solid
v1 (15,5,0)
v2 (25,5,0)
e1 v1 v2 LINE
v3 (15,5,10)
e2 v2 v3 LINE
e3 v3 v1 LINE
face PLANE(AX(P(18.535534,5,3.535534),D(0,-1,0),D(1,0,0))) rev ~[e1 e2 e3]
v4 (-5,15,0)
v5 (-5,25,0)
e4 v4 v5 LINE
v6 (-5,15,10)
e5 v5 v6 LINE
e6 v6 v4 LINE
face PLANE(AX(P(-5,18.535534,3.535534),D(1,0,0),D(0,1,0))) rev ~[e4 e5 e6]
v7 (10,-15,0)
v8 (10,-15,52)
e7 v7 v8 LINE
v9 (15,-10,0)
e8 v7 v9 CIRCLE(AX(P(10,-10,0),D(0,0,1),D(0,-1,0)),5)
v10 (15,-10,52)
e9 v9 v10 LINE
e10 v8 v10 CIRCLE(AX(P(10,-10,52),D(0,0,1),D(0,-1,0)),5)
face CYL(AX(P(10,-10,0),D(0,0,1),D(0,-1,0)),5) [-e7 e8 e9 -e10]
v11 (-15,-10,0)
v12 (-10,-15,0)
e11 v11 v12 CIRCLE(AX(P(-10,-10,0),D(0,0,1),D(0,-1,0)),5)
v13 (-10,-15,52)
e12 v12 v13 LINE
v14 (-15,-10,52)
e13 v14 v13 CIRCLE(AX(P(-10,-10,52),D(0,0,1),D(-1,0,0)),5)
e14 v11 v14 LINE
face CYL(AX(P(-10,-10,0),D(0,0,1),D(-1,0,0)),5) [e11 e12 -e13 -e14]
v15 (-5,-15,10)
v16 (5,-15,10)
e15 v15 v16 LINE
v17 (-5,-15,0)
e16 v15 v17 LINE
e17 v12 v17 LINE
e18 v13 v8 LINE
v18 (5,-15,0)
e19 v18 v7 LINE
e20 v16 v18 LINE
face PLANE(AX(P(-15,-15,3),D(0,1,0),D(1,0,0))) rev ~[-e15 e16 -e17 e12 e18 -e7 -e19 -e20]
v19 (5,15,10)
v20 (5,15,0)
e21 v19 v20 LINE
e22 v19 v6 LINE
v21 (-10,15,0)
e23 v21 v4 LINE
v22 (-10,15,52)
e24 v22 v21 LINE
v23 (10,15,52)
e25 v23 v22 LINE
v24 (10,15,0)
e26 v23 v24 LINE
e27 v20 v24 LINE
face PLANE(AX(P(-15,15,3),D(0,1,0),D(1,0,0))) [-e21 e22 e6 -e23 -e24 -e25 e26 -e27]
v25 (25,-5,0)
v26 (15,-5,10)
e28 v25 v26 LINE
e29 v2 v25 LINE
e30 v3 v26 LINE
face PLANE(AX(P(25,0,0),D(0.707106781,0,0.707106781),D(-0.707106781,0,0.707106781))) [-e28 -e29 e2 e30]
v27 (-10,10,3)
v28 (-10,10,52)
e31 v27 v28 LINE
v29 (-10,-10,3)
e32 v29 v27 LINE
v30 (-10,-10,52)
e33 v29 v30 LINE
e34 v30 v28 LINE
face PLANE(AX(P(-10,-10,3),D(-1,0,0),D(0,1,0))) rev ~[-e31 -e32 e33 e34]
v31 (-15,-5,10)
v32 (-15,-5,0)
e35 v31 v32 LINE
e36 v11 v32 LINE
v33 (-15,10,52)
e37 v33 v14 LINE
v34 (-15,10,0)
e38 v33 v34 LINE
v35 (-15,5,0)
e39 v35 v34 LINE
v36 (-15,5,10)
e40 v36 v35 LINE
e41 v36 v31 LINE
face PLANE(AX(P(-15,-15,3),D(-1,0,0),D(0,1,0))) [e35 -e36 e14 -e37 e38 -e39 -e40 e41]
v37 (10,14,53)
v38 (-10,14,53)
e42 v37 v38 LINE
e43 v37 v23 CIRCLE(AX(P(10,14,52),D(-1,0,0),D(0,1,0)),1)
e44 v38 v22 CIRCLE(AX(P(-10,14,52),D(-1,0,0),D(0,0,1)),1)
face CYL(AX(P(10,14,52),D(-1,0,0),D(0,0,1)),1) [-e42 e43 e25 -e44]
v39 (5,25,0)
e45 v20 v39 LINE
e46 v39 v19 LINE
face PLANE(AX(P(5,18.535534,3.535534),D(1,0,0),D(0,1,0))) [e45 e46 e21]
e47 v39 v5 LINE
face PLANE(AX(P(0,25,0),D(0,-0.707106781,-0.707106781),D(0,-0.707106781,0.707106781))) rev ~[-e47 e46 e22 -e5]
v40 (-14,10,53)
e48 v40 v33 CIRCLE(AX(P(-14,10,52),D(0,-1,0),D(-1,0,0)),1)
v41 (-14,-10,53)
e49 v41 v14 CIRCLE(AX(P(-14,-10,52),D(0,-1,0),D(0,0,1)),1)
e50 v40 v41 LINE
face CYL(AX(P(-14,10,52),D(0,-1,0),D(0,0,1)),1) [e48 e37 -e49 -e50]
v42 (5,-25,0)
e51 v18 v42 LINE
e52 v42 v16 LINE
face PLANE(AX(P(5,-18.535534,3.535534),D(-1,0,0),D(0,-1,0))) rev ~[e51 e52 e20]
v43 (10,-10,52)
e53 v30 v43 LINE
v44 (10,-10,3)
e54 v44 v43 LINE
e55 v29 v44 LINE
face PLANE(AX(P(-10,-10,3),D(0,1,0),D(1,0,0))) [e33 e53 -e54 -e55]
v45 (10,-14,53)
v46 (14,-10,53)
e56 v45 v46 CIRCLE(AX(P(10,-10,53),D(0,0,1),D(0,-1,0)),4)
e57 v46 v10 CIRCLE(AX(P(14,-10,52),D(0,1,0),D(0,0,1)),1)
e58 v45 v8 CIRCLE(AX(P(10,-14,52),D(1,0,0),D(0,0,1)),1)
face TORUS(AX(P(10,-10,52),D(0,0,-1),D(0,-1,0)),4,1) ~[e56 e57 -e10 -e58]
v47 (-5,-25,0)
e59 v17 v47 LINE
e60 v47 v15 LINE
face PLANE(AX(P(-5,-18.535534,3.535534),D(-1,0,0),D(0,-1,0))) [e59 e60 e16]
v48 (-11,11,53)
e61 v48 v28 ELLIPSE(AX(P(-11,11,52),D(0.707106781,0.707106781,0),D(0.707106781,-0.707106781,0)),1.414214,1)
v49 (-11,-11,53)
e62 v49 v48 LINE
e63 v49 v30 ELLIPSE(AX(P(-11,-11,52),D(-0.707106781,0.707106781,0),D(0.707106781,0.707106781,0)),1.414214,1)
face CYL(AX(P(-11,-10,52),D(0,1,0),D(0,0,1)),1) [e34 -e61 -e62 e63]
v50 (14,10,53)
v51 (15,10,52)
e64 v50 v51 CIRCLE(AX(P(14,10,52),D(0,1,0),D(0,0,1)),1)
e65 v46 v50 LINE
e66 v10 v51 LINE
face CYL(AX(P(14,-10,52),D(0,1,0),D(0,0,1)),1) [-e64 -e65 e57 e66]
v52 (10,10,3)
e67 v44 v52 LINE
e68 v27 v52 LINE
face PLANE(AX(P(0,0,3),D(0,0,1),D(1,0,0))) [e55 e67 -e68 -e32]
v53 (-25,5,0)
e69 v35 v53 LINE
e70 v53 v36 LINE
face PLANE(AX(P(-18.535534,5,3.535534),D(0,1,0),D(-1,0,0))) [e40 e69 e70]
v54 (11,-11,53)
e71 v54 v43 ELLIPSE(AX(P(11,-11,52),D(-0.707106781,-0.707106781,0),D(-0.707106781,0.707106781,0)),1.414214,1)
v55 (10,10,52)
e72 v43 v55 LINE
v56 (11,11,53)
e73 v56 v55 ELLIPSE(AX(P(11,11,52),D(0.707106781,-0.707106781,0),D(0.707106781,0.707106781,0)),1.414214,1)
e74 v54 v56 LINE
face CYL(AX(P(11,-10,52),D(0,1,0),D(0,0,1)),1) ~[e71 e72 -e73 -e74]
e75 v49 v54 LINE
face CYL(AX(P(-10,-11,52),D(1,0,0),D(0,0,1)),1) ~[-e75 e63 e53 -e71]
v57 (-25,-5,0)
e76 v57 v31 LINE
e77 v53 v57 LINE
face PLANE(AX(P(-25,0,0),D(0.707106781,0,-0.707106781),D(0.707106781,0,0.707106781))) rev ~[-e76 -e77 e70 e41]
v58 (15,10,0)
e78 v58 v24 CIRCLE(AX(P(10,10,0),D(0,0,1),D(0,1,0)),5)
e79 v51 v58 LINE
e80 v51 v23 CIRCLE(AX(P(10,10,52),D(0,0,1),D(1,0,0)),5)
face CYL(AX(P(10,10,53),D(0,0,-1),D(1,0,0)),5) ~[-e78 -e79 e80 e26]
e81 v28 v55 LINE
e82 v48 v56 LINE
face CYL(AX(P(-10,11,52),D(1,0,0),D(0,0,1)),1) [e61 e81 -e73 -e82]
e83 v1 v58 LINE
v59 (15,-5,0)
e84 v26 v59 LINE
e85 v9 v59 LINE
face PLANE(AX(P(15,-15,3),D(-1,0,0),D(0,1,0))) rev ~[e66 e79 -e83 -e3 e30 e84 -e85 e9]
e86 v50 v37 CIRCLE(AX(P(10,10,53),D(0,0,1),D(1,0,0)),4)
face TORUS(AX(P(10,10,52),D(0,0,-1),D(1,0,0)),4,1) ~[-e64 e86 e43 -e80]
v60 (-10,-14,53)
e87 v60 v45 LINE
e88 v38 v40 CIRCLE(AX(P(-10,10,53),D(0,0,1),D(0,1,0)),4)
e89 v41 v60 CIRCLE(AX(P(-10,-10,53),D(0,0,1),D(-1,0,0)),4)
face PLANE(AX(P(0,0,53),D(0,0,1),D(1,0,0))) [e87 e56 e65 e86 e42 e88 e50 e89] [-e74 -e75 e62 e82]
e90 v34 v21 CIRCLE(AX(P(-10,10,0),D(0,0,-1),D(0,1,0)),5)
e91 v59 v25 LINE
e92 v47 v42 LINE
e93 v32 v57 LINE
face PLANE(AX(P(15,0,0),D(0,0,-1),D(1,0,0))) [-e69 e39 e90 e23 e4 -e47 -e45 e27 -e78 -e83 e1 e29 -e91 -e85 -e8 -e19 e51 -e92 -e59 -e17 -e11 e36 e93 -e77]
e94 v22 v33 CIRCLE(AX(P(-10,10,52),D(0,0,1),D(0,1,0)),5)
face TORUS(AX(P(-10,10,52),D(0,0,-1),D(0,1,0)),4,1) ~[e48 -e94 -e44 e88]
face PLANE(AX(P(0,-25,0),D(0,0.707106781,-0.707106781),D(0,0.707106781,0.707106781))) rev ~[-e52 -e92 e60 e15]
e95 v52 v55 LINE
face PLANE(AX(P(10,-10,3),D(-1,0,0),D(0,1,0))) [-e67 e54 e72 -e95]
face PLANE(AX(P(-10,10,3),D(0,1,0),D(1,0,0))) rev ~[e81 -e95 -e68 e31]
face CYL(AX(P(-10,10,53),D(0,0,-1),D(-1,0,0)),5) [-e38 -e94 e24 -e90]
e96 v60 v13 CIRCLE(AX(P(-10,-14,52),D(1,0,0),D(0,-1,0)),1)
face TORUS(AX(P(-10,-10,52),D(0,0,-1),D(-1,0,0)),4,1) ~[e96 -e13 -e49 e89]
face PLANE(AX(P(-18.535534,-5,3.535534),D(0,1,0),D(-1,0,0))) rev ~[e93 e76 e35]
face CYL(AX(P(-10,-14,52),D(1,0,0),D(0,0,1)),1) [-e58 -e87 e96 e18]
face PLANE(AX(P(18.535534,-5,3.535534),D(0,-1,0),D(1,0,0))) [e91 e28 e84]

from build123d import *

# Parameters (mm, degrees)
F0_W            = 30
F0_H            = 30
F1_DEPTH        = 3
F2_W            = 30
F2_H            = 30
F2_W_2          = 20
F2_H_2          = 20
F3_DEPTH        = 50
F4_R            = 5
F5_R            = 1
F7_DEPTH        = 5
F7_DEPTH_BACK   = 5
F7_COPIES_COUNT = 4


# Not quite as in the source:
# - a pattern or mirror of a feature is missing from the dataset's text; its kind, count and spacing are read off the source's solid


with BuildPart() as f1:
    # F0 (on Top) → F1 (new body)
    with BuildSketch(Plane.XY):
        Rectangle(F0_W, F0_H)
    extrude(amount=F1_DEPTH)

    # F2 (on face) → F3 (join)
    with BuildSketch(Plane.XY.offset(3)):
        Rectangle(F2_W, F2_H)
        Rectangle(F2_W_2, F2_H_2, mode=Mode.SUBTRACT)
    extrude(amount=F3_DEPTH)

    # F4
    f4_edges = [f1.edges().sort_by_distance(p)[0] for p in [
        (-15, -15, 26.5),
        (-15, 15, 26.5),
        (15, 15, 26.5),
        (15, -15, 26.5),
    ]]
    fillet(f4_edges, radius=F4_R)

    # F5
    f5_edges = [f1.edges().sort_by_distance(p)[0] for p in [
        (15, 0, 53),
        (13.535534, -13.535534, 53),
        (13.535534, 13.535534, 53),
        (0, -15, 53),
        (0, 15, 53),
        (-13.535534, -13.535534, 53),
        (-13.535534, 13.535534, 53),
        (-15, 0, 53),
        (0, 10, 53),
        (10, 0, 53),
        (0, -10, 53),
        (-10, 0, 53),
    ]]
    fillet(f5_edges, radius=F5_R)

    # F6 (on Front) → F7 (join, two sides)
    with BuildSketch(Plane.XZ) as f7_sk:
        Polygon((15, 10), (15, 0), (25, 0), align=None)
    f7 = extrude(amount=F7_DEPTH) + extrude(f7_sk.sketch, amount=-F7_DEPTH_BACK)

    # F7_copies: F7 ×4 about axis
    f7_copies_axis = Axis((0, 0, 0), (0, 0, 1))
    for i in range(1, F7_COPIES_COUNT):
        add(f7.rotate(f7_copies_axis, i * 360 / F7_COPIES_COUNT))


solid = f1.part
